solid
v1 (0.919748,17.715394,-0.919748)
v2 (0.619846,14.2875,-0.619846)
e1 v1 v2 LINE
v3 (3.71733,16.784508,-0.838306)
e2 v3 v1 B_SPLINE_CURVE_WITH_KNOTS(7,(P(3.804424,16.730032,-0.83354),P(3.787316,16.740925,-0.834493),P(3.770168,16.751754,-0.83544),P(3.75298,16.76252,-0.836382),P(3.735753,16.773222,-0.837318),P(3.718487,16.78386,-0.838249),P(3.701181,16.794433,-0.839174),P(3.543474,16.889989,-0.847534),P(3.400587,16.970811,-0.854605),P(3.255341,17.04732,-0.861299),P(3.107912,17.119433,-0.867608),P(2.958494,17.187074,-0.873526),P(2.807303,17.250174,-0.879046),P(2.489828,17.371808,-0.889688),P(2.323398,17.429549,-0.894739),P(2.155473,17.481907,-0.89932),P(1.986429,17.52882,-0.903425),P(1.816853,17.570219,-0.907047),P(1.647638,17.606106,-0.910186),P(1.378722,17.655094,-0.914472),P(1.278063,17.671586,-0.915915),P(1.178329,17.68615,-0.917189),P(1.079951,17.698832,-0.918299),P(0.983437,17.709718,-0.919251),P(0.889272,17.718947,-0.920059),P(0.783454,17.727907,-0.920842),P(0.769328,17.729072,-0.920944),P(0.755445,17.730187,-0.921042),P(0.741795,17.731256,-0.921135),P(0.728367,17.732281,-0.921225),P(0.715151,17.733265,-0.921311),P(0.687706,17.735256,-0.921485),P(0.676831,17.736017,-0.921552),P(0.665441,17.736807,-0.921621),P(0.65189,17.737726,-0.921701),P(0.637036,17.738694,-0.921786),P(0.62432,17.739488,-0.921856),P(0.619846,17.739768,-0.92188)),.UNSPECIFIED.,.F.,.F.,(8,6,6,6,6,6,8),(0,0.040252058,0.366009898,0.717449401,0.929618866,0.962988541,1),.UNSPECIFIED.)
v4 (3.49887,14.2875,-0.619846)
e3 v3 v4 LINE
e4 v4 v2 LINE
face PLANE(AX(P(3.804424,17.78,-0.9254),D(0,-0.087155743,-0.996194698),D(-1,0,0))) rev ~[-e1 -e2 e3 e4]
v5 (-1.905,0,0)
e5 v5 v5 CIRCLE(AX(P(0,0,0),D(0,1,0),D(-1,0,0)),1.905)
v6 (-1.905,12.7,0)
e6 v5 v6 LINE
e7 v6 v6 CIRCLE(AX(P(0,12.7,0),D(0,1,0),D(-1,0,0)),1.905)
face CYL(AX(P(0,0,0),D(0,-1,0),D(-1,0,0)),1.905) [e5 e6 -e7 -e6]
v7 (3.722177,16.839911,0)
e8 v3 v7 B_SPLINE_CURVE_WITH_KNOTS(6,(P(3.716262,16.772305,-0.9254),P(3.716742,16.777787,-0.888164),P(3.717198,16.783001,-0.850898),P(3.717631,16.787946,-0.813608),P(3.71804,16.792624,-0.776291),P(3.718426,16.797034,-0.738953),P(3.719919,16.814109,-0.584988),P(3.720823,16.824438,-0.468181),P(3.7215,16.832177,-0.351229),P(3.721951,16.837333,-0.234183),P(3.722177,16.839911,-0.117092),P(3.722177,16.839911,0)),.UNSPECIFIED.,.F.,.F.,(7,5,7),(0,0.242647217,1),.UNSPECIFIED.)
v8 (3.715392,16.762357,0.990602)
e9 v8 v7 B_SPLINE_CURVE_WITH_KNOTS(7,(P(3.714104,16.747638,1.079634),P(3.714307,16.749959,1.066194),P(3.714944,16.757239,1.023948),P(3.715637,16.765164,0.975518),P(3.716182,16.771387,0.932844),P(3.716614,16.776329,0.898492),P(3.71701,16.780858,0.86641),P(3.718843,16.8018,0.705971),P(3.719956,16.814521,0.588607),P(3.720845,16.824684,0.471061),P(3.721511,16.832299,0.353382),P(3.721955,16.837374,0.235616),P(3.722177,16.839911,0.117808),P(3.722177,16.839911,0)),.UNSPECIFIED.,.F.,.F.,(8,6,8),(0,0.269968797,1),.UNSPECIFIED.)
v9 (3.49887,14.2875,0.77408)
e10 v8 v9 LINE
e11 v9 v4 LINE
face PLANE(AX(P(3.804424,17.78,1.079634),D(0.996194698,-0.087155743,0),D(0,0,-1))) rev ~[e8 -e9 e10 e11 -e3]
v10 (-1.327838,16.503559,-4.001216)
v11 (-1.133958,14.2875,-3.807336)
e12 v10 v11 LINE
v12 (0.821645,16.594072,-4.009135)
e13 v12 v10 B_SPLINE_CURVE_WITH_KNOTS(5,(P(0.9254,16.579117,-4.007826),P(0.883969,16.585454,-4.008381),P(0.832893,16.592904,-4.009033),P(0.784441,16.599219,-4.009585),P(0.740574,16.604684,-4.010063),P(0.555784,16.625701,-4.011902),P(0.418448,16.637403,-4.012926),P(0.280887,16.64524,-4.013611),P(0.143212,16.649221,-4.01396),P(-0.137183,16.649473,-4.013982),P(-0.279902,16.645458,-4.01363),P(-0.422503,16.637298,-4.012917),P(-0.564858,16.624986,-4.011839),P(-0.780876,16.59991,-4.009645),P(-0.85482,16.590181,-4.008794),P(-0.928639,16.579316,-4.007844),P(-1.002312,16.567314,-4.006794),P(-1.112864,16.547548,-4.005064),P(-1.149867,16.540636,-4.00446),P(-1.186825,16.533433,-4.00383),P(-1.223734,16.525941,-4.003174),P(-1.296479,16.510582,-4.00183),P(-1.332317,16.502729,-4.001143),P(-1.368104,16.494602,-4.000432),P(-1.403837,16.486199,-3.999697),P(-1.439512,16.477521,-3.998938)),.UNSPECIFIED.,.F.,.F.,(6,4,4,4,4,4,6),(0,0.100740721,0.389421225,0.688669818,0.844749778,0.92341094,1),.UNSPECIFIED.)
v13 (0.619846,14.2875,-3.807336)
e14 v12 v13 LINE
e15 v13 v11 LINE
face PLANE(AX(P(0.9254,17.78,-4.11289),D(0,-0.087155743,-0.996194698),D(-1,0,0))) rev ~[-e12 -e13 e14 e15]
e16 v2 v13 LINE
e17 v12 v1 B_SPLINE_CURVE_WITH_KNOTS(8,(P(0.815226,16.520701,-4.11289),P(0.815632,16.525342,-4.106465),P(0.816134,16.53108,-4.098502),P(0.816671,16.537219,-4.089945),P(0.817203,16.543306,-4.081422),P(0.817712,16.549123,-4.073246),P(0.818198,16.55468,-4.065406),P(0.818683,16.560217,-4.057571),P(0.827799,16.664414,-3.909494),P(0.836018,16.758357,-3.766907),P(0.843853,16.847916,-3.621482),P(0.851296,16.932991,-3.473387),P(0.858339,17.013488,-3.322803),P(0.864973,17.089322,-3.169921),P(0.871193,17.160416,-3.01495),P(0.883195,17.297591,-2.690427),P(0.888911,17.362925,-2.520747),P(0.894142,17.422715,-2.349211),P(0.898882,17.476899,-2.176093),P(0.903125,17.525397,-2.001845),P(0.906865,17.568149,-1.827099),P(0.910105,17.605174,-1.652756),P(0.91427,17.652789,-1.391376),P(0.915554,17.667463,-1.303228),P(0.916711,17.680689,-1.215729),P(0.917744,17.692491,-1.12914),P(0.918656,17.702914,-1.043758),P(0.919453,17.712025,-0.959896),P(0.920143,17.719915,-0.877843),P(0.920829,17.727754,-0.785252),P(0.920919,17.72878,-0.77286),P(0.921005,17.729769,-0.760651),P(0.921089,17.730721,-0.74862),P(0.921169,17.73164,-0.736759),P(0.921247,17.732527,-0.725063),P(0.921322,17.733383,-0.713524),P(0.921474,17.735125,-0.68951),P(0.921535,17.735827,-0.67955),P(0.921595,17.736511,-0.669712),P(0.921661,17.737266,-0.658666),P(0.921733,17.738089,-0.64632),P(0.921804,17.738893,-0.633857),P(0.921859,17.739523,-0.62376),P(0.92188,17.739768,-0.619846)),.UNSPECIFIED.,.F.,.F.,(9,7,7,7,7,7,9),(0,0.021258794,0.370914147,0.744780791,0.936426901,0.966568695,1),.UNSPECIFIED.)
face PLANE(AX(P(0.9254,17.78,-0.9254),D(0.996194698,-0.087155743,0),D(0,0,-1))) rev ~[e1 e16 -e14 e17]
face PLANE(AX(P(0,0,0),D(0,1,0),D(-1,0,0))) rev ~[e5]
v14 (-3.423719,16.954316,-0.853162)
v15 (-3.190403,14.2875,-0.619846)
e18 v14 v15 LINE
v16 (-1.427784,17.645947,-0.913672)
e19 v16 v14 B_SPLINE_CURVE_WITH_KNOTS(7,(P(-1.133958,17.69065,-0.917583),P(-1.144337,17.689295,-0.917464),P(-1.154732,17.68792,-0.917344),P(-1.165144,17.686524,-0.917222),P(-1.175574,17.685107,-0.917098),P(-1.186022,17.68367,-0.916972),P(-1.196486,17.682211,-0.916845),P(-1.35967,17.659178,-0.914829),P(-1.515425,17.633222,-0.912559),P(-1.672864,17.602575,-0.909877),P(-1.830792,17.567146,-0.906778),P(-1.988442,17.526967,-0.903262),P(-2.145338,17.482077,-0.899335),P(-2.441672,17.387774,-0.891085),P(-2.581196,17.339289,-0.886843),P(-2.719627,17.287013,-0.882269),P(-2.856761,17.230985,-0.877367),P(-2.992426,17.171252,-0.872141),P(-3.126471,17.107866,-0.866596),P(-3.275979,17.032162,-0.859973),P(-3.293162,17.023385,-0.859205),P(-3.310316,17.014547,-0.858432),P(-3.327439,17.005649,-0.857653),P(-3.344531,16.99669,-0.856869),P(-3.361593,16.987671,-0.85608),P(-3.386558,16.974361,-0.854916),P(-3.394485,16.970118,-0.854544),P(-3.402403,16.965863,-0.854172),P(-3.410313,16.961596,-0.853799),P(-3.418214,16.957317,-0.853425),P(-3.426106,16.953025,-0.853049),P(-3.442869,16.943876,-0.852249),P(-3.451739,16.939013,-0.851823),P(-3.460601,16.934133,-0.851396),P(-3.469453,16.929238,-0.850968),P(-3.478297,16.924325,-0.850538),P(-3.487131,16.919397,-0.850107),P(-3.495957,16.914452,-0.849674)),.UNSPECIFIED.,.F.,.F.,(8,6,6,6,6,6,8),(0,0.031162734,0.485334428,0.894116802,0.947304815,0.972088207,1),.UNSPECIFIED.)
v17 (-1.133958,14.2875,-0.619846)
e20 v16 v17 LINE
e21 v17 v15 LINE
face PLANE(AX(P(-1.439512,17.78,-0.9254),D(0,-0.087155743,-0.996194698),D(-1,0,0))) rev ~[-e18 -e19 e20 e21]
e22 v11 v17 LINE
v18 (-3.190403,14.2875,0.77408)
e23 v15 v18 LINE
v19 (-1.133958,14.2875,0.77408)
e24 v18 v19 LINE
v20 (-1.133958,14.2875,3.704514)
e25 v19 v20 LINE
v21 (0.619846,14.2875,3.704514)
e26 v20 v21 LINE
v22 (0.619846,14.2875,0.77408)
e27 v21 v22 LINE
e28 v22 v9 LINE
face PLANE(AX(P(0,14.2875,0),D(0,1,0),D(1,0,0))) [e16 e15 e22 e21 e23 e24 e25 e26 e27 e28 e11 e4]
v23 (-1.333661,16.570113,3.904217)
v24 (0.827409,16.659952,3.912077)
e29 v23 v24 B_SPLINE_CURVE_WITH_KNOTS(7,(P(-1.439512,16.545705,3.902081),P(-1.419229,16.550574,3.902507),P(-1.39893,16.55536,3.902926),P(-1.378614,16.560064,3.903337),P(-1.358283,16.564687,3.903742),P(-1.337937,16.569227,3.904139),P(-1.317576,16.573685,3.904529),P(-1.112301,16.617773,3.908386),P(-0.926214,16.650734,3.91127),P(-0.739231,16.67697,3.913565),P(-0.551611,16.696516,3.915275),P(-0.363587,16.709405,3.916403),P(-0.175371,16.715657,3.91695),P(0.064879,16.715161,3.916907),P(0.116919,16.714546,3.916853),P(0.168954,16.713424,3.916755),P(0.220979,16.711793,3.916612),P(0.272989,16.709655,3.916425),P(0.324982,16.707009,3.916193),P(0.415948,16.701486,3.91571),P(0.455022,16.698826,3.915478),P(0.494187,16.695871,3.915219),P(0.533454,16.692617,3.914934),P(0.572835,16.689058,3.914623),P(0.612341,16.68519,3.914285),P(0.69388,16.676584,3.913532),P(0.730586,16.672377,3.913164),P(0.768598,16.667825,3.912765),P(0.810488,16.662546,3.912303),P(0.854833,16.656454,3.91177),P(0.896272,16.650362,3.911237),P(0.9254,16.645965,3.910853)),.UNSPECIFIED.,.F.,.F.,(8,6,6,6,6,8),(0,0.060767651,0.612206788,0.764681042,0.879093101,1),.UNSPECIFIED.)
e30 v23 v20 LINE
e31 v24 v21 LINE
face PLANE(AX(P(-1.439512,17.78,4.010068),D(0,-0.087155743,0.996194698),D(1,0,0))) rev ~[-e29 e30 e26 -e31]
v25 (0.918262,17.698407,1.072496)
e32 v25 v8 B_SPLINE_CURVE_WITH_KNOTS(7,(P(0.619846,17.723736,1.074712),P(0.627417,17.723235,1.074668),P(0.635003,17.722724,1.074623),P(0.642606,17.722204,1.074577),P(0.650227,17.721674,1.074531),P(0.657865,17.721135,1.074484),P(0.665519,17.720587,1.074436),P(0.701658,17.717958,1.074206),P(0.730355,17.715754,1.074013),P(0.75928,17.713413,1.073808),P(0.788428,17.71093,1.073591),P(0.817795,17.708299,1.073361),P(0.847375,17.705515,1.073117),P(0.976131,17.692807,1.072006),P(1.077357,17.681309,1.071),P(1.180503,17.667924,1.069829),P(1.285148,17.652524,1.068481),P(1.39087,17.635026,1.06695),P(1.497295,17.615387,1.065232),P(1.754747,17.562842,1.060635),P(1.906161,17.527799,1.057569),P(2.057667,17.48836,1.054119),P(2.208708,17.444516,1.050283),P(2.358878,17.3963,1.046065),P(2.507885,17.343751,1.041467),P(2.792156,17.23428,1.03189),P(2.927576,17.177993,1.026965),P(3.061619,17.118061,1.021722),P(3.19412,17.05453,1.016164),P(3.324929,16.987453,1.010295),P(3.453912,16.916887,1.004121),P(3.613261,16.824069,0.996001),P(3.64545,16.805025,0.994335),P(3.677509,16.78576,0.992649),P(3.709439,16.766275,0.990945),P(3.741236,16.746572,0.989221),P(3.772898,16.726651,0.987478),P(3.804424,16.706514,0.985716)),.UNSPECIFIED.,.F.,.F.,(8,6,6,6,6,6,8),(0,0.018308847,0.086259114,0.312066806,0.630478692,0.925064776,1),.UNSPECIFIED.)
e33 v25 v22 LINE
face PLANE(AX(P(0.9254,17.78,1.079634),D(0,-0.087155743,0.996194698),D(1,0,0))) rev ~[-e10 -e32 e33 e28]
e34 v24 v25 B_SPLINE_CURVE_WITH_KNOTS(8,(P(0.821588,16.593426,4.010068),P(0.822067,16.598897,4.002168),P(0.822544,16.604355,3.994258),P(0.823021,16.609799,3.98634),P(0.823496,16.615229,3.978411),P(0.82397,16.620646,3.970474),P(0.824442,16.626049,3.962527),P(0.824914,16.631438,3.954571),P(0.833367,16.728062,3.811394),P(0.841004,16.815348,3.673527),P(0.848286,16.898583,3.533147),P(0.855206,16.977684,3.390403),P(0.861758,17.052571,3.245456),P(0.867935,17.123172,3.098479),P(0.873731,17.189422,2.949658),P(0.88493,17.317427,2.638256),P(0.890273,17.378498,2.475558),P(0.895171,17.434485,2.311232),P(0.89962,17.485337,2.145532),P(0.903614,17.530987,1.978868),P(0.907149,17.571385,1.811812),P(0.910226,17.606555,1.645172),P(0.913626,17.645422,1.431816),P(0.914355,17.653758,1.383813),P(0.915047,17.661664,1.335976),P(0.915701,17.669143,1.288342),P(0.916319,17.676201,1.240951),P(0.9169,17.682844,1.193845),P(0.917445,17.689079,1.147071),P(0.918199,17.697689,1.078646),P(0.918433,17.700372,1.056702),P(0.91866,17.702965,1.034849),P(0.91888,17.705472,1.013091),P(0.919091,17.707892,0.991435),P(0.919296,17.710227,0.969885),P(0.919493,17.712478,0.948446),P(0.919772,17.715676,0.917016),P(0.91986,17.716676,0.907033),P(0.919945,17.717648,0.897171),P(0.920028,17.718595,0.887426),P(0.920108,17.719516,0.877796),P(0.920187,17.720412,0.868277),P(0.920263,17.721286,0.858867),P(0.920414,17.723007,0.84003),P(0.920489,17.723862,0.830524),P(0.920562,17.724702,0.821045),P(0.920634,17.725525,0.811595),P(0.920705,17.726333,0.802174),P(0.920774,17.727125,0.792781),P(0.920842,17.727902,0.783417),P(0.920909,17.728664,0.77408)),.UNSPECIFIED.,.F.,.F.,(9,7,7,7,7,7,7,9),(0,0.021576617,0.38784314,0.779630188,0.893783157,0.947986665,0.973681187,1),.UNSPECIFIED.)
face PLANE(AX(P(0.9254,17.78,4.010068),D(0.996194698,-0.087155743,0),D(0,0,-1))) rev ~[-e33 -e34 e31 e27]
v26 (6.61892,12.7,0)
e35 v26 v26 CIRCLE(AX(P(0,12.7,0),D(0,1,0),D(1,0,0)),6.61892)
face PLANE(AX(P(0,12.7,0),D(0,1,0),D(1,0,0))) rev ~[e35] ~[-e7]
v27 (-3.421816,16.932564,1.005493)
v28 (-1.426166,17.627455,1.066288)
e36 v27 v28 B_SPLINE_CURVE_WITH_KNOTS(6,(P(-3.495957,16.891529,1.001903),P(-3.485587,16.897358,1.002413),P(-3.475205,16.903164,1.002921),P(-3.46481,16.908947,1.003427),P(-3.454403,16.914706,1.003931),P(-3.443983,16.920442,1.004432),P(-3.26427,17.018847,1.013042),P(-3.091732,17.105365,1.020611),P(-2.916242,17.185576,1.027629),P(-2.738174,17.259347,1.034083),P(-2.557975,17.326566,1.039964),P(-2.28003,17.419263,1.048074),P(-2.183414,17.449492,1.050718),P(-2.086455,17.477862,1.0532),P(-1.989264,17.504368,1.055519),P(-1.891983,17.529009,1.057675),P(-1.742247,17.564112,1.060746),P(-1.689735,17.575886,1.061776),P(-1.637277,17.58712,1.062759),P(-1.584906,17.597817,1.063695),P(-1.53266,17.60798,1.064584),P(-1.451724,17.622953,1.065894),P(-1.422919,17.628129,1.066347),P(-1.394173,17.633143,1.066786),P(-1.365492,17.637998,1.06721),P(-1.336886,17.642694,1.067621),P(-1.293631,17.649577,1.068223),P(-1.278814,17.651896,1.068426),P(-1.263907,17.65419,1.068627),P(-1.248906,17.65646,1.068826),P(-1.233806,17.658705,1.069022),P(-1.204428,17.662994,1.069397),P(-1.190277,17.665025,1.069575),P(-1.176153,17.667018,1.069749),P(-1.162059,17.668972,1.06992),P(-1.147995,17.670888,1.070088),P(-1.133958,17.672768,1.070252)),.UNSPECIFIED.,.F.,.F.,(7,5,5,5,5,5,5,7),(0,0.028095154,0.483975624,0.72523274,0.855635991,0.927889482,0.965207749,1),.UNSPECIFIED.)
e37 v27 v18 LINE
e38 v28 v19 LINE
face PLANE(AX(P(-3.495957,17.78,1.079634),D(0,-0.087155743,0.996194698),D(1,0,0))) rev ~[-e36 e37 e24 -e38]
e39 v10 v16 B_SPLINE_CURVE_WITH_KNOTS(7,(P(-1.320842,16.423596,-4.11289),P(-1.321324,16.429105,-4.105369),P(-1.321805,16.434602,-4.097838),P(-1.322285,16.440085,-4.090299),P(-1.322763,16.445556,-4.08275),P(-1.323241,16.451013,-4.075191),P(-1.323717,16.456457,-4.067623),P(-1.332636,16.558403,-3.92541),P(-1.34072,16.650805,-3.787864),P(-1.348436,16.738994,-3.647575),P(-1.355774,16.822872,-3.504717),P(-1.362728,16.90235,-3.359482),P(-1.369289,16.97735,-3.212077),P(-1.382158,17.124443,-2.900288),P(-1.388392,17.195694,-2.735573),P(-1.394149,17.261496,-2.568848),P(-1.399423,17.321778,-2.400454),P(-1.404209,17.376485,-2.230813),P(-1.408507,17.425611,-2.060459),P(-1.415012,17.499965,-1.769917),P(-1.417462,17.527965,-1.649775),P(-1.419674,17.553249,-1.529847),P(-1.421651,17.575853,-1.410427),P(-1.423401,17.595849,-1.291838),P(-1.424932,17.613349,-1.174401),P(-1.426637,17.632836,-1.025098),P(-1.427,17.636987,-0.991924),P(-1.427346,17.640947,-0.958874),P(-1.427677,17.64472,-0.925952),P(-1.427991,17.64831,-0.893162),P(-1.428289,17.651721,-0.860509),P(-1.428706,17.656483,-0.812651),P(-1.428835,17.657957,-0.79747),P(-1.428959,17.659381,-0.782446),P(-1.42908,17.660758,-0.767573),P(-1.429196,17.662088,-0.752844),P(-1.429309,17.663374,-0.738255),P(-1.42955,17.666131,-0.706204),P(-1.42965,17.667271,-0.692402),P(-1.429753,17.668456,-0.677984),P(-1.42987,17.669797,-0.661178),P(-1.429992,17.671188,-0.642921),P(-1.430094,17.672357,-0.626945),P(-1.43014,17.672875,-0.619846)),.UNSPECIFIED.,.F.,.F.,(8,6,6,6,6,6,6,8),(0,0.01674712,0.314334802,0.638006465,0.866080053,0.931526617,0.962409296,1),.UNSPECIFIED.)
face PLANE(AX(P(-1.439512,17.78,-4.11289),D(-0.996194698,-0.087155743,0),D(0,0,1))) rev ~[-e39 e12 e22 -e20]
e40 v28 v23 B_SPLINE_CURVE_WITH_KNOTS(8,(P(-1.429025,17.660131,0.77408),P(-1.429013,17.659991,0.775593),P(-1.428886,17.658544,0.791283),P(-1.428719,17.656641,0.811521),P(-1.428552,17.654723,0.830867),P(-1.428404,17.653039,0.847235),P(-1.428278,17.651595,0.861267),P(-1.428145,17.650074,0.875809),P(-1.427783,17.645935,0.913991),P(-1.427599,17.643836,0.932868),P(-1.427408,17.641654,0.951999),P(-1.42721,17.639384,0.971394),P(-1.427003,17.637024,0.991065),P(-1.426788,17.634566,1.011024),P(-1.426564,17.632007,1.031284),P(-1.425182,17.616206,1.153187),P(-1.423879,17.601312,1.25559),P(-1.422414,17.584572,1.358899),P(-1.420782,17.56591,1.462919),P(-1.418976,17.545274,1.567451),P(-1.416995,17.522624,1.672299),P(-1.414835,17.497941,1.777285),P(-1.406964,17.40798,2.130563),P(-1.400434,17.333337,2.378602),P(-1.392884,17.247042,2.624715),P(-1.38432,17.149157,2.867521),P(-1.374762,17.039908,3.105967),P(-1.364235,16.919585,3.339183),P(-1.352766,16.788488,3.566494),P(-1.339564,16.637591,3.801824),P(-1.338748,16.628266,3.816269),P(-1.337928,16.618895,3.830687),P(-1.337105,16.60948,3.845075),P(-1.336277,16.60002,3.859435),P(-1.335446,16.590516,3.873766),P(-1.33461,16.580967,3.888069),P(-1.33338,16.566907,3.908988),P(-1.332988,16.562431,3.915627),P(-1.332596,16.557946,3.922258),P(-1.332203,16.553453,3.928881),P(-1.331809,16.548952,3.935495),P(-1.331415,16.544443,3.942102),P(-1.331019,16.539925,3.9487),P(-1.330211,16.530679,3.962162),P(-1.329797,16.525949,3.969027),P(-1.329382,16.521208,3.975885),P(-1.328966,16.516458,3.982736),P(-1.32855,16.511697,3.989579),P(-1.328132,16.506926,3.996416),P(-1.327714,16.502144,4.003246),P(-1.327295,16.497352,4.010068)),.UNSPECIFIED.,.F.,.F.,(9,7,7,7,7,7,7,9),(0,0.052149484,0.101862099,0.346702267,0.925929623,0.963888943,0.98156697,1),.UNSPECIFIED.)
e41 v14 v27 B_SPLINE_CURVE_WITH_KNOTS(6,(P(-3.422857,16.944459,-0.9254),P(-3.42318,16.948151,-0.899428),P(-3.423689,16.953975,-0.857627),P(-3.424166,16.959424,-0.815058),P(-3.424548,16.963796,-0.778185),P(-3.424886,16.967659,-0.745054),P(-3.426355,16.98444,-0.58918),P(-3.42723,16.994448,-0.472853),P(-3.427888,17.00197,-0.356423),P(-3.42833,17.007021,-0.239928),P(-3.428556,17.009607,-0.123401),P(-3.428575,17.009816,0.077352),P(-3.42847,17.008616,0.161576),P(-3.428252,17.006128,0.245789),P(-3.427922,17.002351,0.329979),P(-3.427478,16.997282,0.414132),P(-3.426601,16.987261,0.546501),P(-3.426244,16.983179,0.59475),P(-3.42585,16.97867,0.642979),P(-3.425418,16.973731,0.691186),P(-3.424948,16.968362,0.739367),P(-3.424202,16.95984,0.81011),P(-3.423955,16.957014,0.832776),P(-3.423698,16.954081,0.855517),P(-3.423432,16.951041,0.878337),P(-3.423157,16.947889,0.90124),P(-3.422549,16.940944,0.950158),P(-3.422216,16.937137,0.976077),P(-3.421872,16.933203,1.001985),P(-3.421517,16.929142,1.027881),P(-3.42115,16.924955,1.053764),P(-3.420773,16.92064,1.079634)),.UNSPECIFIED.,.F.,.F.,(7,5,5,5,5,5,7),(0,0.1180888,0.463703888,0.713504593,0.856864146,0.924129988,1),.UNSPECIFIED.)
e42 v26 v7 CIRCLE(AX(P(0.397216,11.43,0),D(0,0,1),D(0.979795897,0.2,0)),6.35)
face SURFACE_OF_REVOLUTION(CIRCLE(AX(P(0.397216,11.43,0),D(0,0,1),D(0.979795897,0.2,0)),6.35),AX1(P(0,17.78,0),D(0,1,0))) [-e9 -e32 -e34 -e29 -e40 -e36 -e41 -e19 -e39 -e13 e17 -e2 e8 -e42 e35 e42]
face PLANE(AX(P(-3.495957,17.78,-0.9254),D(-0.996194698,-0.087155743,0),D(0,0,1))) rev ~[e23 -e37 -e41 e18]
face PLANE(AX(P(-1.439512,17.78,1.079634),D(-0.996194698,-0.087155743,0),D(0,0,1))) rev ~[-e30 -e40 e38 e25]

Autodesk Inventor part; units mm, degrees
ref_plane "YZ Plane" through (0, 0, 0) normal (1, 0, 0) x (0, 1, 0)
ref_plane "XZ Plane" through (0, 0, 0) normal (0, 1, 0) x (-1, 0, 0)
ref_plane "XY Plane" through (0, 0, 0) normal (0, 0, 1) x (1, 0, 0)
sketch "Sketch1" plane through (0, 0, 0) normal (0, 1, 0) x (-1, 0, 0)
  circle A0 centre (0, 0) radius 1.905
  dimension "d0" = 3.81
extrude "Extrusion1" add sketch "Sketch1" along normal blind 12.7
thread "Thread1" size "8-32 UNC" class "2A" standard "ANSI Unified Screw Threads" full length
sketch "Sketch2" plane through (0, 12.7, 0) normal (0, 1, 0) x (1, 0, 0)
  circle A0 centre (0, 0) radius 6.61892
extrude "Extrusion2" add sketch "Sketch2" along normal blind 5.08
fillet "Fillet1" radius 6.35 1 edges at (-6.6189, 17.78, 0)
sketch "Sketch3" plane through (0, 17.78, 0) normal (0, 1, 0) x (1, 0, 0)
  line L0 (-3.495957, -1.079634) -> (3.804424, -1.079634)
  line L1 (3.804424, -1.079634) -> (3.804424, 0.9254)
  line L2 (3.804424, 0.9254) -> (-3.495957, 0.9254)
  line L3 (-3.495957, 0.9254) -> (-3.495957, -1.079634)
  line L4 (-1.439512, -4.010068) -> (0.9254, -4.010068)
  line L5 (0.9254, -4.010068) -> (0.9254, 4.11289)
  line L6 (0.9254, 4.11289) -> (-1.439512, 4.11289)
  line L7 (-1.439512, 4.11289) -> (-1.439512, -4.010068)
  point P0 (0, 0)
sketch "Sketch3 outline for Extrusion3" plane through (0, 17.78, 0) normal (0, 1, 0) x (1, 0, 0)
  line L0 (-1.439512, 0.9254) -> (-3.495957, 0.9254)
  line L1 (-3.495957, 0.9254) -> (-3.495957, -1.079634)
  line L2 (-3.495957, -1.079634) -> (-1.439512, -1.079634)
  line L3 (-1.439512, -1.079634) -> (-1.439512, -4.010068)
  line L4 (-1.439512, -4.010068) -> (0.9254, -4.010068)
  line L5 (0.9254, -4.010068) -> (0.9254, -1.079634)
  line L6 (0.9254, -1.079634) -> (3.804424, -1.079634)
  line L7 (3.804424, -1.079634) -> (3.804424, 0.9254)
  line L8 (3.804424, 0.9254) -> (0.9254, 0.9254)
  line L9 (0.9254, 0.9254) -> (0.9254, 4.11289)
  line L10 (0.9254, 4.11289) -> (-1.439512, 4.11289)
  line L11 (-1.439512, 4.11289) -> (-1.439512, 0.9254)
extrude "Extrusion3" cut sketch "Sketch3 outline for Extrusion3" against normal blind 3.4925 draft -5
properties part number "tiny screw"
